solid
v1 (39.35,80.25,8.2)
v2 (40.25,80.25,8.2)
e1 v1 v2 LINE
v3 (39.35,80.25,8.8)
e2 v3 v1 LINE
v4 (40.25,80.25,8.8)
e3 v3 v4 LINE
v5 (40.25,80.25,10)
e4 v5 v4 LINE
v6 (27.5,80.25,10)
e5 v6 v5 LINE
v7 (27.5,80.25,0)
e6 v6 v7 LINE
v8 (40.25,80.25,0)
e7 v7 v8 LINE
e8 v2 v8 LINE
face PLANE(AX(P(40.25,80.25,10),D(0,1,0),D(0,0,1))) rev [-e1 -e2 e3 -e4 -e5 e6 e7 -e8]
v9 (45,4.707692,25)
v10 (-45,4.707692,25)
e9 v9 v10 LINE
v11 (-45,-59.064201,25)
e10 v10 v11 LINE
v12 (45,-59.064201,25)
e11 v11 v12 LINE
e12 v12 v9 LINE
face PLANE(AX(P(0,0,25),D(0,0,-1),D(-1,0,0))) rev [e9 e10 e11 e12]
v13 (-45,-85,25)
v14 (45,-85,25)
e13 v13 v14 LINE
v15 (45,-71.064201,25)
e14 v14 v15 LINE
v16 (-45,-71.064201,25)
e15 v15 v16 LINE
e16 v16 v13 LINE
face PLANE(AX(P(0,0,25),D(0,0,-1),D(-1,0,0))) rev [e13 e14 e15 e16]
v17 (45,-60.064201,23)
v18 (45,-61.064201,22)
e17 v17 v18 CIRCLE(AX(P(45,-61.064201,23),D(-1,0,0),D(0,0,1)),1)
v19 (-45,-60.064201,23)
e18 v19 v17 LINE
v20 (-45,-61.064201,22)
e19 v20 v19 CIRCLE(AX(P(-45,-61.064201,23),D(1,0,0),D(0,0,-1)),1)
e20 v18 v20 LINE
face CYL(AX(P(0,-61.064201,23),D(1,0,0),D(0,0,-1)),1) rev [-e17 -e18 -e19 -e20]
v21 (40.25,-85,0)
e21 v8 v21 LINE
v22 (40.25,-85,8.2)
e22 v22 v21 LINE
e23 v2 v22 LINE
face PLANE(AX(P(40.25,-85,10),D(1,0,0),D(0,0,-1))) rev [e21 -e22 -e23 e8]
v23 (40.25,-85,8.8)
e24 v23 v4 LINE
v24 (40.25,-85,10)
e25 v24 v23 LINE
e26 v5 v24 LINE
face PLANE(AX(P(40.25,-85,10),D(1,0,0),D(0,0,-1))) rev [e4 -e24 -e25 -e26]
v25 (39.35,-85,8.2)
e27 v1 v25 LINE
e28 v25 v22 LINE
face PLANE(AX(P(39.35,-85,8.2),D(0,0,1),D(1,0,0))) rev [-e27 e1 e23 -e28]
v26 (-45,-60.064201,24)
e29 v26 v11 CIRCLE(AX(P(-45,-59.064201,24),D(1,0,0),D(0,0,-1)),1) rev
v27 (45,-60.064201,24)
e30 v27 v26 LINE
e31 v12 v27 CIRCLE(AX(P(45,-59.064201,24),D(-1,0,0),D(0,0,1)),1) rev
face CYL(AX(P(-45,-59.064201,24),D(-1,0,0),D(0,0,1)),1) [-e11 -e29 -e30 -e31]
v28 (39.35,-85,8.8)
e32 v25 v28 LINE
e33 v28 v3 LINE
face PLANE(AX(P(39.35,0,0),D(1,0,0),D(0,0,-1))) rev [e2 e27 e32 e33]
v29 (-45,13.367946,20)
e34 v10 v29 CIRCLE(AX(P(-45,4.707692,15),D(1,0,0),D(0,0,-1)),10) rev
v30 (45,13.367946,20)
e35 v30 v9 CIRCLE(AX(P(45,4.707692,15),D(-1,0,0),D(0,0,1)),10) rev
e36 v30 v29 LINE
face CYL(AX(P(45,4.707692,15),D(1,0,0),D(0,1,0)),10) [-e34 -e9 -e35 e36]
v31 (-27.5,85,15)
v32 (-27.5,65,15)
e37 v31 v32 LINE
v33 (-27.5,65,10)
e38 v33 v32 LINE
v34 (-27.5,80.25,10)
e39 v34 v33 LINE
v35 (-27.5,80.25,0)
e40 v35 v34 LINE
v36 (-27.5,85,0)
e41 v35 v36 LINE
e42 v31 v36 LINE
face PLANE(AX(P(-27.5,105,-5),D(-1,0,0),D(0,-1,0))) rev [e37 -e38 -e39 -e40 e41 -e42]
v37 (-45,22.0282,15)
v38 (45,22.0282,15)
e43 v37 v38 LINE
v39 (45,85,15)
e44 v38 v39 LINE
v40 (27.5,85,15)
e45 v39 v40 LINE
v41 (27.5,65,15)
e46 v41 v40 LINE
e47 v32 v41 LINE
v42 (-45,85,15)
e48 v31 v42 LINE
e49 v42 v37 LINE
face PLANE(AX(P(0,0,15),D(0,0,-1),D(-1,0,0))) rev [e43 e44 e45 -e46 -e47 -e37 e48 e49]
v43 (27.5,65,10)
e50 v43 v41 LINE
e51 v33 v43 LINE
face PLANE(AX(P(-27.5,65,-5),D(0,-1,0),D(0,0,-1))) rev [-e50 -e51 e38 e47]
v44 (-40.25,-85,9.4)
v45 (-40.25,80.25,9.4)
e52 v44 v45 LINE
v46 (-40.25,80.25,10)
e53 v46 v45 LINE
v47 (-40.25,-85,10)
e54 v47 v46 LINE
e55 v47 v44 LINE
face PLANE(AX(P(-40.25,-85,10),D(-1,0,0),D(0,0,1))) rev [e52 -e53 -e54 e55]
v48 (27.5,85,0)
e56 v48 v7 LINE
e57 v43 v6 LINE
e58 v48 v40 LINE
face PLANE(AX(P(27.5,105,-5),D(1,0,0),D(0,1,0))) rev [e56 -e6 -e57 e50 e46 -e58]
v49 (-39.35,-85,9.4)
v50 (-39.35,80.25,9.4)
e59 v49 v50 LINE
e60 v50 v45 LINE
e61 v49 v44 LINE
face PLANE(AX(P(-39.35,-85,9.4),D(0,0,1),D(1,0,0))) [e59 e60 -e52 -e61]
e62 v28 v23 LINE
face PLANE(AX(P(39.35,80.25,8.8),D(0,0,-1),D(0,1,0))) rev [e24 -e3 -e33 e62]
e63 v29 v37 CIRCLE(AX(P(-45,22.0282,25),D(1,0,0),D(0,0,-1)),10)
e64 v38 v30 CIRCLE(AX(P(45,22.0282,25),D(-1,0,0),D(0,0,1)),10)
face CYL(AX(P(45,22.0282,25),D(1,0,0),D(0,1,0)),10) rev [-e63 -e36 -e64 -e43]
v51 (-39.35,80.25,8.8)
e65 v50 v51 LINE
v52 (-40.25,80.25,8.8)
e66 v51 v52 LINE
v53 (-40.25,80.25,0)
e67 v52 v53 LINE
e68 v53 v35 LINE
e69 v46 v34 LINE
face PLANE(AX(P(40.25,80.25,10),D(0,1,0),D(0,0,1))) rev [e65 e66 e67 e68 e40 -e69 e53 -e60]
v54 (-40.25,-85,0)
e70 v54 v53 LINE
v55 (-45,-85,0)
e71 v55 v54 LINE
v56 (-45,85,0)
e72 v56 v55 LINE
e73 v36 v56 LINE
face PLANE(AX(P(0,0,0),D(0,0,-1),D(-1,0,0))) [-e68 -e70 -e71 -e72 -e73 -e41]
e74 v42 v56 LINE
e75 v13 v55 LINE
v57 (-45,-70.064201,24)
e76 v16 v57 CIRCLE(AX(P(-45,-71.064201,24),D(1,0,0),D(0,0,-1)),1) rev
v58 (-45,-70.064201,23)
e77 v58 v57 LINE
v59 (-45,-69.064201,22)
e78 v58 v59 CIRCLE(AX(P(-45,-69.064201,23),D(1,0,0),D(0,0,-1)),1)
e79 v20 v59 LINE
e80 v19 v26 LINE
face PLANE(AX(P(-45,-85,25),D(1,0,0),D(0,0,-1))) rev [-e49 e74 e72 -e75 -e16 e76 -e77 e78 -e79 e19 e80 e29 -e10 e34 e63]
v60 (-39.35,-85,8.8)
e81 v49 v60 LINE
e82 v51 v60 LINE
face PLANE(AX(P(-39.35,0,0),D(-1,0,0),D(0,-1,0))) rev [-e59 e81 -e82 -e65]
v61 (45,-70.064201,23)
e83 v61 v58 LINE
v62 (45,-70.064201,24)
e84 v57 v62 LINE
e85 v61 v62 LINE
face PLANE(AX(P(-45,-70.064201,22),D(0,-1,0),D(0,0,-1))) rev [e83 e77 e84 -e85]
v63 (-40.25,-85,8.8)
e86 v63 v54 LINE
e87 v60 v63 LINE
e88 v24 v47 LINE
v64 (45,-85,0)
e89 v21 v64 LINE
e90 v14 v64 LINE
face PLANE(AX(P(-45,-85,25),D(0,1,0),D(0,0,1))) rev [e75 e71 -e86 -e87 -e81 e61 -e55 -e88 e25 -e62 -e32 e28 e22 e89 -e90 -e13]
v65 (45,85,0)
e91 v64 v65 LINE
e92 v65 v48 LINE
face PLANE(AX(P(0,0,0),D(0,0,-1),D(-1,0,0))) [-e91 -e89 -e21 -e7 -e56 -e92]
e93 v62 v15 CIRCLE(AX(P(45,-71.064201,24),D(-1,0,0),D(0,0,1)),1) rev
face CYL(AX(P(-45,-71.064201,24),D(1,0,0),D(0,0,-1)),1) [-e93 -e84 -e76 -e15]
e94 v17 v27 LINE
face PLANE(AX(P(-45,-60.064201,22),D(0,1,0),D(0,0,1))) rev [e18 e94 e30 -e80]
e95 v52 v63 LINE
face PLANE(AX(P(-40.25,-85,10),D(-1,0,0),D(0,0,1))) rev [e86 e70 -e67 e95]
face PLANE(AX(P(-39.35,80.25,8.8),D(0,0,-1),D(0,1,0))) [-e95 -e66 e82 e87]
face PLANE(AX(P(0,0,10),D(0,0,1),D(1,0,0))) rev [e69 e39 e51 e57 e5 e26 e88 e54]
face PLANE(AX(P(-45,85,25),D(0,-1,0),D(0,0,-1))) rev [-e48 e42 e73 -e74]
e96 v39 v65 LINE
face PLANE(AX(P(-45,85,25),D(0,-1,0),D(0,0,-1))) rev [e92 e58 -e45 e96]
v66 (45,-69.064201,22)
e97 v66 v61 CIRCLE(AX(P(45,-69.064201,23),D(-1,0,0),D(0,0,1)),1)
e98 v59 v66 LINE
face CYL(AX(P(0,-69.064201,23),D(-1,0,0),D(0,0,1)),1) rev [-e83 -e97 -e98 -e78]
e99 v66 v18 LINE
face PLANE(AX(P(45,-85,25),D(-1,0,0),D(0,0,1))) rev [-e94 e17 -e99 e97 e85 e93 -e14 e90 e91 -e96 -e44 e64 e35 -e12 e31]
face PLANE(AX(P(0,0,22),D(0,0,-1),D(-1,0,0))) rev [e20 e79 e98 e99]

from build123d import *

# Parameters (mm, degrees)
SKETCH_1_W          = 90
SKETCH_1_H          = 170
EXTRUDE_1_DEPTH     = 25
SKETCH_2_W          = 90
SKETCH_2_H          = 70.292308138
CUT_EXTRUDE_1_DEPTH = 10
FILLET_1_R          = 10
FILLET_2_R          = 10
SKETCH_3_W          = 80.5
SKETCH_3_H          = 165.25
CUT_EXTRUDE_2_DEPTH = 10
SKETCH_5_W          = 0.6
SKETCH_5_H          = 165.25
EXTRUDE_2_DEPTH     = 0.9
SKETCH_6_W          = 0.6
SKETCH_6_H          = 165.25
EXTRUDE_3_DEPTH     = 0.9
SKETCH_9_W          = 90
SKETCH_9_H          = 10
CUT_EXTRUDE_5_DEPTH = 3
FILLET_8_R          = 1
FILLET_9_R          = 1
SKETCH_10_W         = 55
SKETCH_10_H         = 40
CUT_EXTRUDE_6_DEPTH = 20


with BuildPart() as part:
    # 草图1 → 凸台-拉伸1 (new body)
    with BuildSketch(Plane.XY):
        Rectangle(SKETCH_1_W, SKETCH_1_H)
    extrude(amount=EXTRUDE_1_DEPTH)

    # 草图2 → 切除-拉伸1 (cut)
    with BuildSketch(Plane.XY.offset(25)):
        with Locations((0, 49.853845931)):
            Rectangle(SKETCH_2_W, SKETCH_2_H)
    extrude(amount=-CUT_EXTRUDE_1_DEPTH, mode=Mode.SUBTRACT)

    # 圆角1
    fillet_1_edges = [part.edges().sort_by_distance(p)[0] for p in [
        (0, 14.707691862, 25),
    ]]
    fillet(fillet_1_edges, radius=FILLET_1_R - 0.0001)  # a hair under: the kernel refuses the full size

    # 圆角2
    fillet_2_edges = [part.edges().sort_by_distance(p)[0] for p in [
        (0, 14.707691862, 15),
    ]]
    fillet(fillet_2_edges, radius=FILLET_2_R)

    # 草图3 → 切除-拉伸2 (cut)
    with BuildSketch(Plane(origin=(0, 0, 0), x_dir=(-1, 0, 0), z_dir=(0, 0, -1))):
        with Locations((0, -2.375)):
            Rectangle(SKETCH_3_W, SKETCH_3_H)
    extrude(amount=-CUT_EXTRUDE_2_DEPTH, mode=Mode.SUBTRACT)

    # 草图5 → 凸台-拉伸2 (add)
    with BuildSketch(Plane.ZY.offset(-40.25)):
        with Locations((8.5, -2.375)):
            Rectangle(SKETCH_5_W, SKETCH_5_H)
    extrude(amount=EXTRUDE_2_DEPTH)

    # 草图6 → 凸台-拉伸3 (add)
    with BuildSketch(Plane(origin=(-40.25, 0, 0), x_dir=(0, 0, -1), z_dir=(1, 0, 0))):
        with Locations((-9.1, -2.375)):
            Rectangle(SKETCH_6_W, SKETCH_6_H)
    extrude(amount=EXTRUDE_3_DEPTH)

    # 草图9 → 切除-拉伸5 (cut)
    with BuildSketch(Plane.XY.offset(25)):
        with Locations((0, -65.064201391)):
            Rectangle(SKETCH_9_W, SKETCH_9_H)
    extrude(amount=-CUT_EXTRUDE_5_DEPTH, mode=Mode.SUBTRACT)

    # 圆角8
    fillet_8_edges = [part.edges().sort_by_distance(p)[0] for p in [
        (0, -60.064201391, 22),
        (0, -60.064201391, 25),
    ]]
    fillet(fillet_8_edges, radius=FILLET_8_R)

    # 圆角9
    fillet_9_edges = [part.edges().sort_by_distance(p)[0] for p in [
        (0, -70.064201391, 22),
        (0, -70.064201391, 25),
    ]]
    fillet(fillet_9_edges, radius=FILLET_9_R)

    # 草图10 → 切除-拉伸6 (cut)
    with BuildSketch(Plane.XY.offset(15)):
        with Locations((0, 85)):
            Rectangle(SKETCH_10_W, SKETCH_10_H)
    extrude(amount=-CUT_EXTRUDE_6_DEPTH, mode=Mode.SUBTRACT)


solid = part.part
